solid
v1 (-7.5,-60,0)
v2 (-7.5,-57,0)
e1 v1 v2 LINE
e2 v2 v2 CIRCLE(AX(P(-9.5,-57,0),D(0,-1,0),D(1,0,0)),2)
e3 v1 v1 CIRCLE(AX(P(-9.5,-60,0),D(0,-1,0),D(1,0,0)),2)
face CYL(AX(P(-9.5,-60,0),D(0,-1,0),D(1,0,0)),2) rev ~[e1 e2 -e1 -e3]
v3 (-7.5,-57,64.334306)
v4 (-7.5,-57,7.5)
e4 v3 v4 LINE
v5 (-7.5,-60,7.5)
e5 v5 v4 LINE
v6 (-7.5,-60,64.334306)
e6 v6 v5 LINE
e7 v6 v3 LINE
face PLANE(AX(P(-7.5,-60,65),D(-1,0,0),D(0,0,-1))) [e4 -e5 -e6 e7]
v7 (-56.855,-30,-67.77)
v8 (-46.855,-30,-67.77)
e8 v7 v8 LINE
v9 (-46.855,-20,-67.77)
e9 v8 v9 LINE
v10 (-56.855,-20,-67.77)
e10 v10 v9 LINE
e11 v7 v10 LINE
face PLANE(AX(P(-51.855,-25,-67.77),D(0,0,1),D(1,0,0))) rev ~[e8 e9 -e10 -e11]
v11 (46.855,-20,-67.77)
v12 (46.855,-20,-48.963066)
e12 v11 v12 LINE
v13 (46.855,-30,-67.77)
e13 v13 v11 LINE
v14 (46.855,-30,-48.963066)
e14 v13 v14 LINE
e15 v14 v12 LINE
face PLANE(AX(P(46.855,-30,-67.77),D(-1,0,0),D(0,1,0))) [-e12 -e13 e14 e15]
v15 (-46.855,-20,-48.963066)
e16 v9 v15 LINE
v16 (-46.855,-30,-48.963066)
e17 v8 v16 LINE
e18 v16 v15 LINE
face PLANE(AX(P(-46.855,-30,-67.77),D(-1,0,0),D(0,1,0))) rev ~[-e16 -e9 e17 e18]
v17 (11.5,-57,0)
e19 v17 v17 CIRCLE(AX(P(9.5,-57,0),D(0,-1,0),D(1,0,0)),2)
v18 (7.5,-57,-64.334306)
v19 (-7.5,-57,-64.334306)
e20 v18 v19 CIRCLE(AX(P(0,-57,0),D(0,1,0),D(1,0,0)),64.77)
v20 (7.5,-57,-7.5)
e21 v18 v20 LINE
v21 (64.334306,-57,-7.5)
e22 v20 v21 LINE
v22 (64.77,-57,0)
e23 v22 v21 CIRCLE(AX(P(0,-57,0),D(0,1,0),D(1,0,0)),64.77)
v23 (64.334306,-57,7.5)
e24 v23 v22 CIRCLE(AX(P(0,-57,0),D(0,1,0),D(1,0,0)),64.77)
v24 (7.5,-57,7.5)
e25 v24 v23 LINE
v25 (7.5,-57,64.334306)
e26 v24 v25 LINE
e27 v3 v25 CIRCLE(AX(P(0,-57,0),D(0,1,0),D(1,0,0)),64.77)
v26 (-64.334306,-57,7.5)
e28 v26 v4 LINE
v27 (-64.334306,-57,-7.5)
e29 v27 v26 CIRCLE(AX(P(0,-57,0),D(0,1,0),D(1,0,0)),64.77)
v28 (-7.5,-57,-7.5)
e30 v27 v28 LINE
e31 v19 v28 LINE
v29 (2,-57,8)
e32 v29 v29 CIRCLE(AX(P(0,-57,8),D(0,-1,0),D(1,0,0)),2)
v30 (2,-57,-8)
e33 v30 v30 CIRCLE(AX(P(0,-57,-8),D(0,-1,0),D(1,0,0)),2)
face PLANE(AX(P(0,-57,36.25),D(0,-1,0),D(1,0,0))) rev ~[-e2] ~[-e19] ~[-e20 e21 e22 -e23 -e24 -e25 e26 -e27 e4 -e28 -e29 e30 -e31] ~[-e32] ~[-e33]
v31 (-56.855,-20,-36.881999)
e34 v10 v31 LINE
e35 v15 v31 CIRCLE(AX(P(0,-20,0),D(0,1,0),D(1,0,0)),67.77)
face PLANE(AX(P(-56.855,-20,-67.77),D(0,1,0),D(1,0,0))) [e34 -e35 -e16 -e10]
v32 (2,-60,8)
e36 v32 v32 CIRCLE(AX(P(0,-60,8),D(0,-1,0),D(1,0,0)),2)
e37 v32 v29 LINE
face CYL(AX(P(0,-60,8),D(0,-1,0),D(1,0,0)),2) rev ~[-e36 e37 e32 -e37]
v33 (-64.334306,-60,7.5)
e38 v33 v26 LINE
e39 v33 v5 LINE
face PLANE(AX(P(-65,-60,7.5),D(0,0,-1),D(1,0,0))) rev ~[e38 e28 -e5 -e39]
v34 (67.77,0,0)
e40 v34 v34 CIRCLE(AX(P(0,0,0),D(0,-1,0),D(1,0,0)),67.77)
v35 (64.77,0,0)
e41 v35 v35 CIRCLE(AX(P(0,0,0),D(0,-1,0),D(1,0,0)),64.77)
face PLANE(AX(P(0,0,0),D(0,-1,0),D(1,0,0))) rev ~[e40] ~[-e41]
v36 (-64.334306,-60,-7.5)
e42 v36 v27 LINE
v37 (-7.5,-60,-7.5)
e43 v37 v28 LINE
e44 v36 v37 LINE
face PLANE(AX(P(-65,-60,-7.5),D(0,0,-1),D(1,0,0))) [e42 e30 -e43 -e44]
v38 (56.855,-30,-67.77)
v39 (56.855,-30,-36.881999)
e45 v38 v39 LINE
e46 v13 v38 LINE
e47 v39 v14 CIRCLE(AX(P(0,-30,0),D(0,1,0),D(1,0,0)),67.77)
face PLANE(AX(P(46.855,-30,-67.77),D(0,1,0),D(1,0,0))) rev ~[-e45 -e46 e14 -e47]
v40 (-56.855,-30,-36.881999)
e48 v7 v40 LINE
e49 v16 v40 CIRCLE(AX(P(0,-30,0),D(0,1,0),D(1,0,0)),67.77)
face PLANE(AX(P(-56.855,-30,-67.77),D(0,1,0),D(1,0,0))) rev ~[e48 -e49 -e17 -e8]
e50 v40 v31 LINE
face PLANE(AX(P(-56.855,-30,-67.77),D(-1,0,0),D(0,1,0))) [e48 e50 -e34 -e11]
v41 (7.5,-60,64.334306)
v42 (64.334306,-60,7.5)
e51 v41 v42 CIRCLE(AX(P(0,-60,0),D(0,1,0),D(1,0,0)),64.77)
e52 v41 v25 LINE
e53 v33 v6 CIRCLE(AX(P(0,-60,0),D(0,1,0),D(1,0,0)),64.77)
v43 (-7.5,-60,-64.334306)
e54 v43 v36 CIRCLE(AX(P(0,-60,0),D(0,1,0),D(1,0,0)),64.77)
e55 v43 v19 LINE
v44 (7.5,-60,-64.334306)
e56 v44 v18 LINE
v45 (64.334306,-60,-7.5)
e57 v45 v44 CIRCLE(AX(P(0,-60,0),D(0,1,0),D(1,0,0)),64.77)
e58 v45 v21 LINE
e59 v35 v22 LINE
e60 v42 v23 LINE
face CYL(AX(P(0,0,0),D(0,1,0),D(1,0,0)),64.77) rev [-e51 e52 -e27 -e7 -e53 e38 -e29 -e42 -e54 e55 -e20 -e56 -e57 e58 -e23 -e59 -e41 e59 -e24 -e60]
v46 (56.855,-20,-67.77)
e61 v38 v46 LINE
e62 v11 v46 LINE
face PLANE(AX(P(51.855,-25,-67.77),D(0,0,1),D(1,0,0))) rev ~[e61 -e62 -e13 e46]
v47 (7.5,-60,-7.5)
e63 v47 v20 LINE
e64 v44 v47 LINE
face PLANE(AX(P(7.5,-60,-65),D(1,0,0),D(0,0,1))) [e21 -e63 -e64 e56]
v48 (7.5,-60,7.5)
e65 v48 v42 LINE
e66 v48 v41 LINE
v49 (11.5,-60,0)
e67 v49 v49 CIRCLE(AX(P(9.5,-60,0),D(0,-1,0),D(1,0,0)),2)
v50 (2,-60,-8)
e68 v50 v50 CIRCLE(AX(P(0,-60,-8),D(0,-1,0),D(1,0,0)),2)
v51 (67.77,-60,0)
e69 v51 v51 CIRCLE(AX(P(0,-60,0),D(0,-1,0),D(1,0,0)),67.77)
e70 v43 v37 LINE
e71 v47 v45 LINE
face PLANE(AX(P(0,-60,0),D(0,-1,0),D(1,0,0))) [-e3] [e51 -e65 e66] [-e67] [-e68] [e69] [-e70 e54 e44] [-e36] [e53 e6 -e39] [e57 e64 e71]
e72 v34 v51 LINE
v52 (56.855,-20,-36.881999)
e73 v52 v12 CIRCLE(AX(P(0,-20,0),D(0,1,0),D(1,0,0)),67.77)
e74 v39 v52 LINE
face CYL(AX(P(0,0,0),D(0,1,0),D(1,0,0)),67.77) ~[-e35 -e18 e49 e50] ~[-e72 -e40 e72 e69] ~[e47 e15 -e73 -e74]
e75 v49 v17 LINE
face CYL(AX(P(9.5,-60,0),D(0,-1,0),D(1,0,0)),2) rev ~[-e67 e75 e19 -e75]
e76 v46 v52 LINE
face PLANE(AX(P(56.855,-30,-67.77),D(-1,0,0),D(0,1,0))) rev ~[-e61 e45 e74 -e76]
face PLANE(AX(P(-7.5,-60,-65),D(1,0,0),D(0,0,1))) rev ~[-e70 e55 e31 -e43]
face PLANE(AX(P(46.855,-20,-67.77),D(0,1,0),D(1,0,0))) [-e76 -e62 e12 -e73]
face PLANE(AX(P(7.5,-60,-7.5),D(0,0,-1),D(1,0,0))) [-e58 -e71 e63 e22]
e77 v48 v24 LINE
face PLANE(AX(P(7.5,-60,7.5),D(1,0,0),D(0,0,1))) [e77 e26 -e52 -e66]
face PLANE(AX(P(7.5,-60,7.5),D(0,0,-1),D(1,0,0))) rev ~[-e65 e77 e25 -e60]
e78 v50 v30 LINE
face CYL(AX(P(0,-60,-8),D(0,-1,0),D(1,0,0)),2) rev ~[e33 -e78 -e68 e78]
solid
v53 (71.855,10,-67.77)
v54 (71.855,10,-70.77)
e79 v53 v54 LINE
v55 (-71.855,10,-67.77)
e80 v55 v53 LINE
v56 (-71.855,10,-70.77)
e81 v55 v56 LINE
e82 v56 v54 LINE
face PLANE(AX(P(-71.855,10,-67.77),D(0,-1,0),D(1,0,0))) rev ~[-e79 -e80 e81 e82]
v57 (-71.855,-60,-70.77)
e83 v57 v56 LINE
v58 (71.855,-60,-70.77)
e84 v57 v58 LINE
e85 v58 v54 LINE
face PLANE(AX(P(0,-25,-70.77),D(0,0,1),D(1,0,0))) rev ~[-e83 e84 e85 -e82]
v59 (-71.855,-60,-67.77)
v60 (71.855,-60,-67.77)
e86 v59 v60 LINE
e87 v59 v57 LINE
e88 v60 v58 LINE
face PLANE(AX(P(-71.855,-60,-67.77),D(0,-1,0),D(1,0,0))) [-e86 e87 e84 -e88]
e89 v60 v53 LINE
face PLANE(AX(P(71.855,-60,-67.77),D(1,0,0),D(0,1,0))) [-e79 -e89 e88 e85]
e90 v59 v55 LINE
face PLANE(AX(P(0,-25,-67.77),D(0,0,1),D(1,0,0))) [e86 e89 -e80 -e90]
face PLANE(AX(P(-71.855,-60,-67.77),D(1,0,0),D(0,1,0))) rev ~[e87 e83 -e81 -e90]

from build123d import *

# Parameters (mm, degrees)
F0_R        = 67.77
F1_DEPTH    = 60
F2_T        = -3
F4_W        = 143.71
F4_H        = 70
F5_DEPTH    = 3
F6_W        = 10
F6_H        = 10
F7_DEPTH    = 35
F8_T4_DEPTH = 77.0795565602
F8_S5_R     = 64.77
F8_T6_DEPTH = 41
F9_T4_DEPTH = 77.0795565602
F9_S5_R     = 64.77
F9_T6_DEPTH = 41
F10_W       = 15
F10_H       = 57.5
F10_W_2     = 57.5
F10_H_2     = 15
F11_DEPTH   = 3
F12_R       = 2
F13_DEPTH   = 3


# Not quite as in the source:
# - a fillet or chamfer that OpenCascade refuses, or shapes differently, is made with other operations: its cross-section is extruded or revolved along the edge and cut away or added


with BuildPart() as f1:
    # F0 (on Front) → F1 (new body)
    with BuildSketch(Plane.XZ):
        Circle(F0_R)
    extrude(amount=F1_DEPTH)

    # F2
    f2_openings = [f1.faces().sort_by_distance(p)[0] for p in [
        (0, -60, 0),
        (0, 0, 0),
    ]]
    offset(amount=F2_T, openings=f2_openings)

    # F6 (on face) → F7 (join)
    with BuildSketch(Plane.XY.offset(-67.77)):
        with Locations((-51.855, -25)):
            Rectangle(F6_W, F6_H)
        with Locations((51.855, -25)):
            Rectangle(F6_W, F6_H)
    extrude(amount=F7_DEPTH)

    # F8: chamfer of 10 x 13 on 1 edges, made by hand


with BuildPart() as f5:
    # F4 (on offset) → F5 (new body)
    with BuildSketch(Plane.XY.offset(-67.77)):
        with Locations((0, -25)):
            Rectangle(F4_W, F4_H)
    extrude(amount=-F5_DEPTH)


with BuildPart() as f8_tool2:
    # F8_s3 → F8_t4 (new body)
    with BuildSketch(Plane.XZ.offset(63.5397782801)):
        Polygon((-46.855, -45.77), (-56.855, -32.77), (-46.855, -32.77), align=None)
    extrude(amount=-F8_T4_DEPTH)

    # F8_s5 → F8_t6 (intersect, symmetric)
    with BuildSketch(Plane.XZ.offset(25)):
        Circle(F8_S5_R)
    extrude(amount=F8_T6_DEPTH, both=True, mode=Mode.INTERSECT)


with BuildPart() as f1_1:
    add(f1.part)

    # F8_t1: cut F8_tool2
    add(f8_tool2.part, mode=Mode.SUBTRACT)

    # F9: chamfer of 13 x 10 on 1 edges, made by hand


with BuildPart() as f9_tool2:
    # F9_s3 → F9_t4 (new body)
    with BuildSketch(Plane.XZ.offset(-13.5397782801)):
        Polygon((46.855, -45.77), (56.855, -32.77), (46.855, -32.77), align=None)
    extrude(amount=F9_T4_DEPTH)

    # F9_s5 → F9_t6 (intersect, symmetric)
    with BuildSketch(Plane.XZ.offset(25)):
        Circle(F9_S5_R)
    extrude(amount=F9_T6_DEPTH, both=True, mode=Mode.INTERSECT)


with BuildPart() as f1_2:
    add(f1_1.part)

    # F9_t1: cut F9_tool2
    add(f9_tool2.part, mode=Mode.SUBTRACT)

    # F10 (on face) → F11 (join)
    with BuildSketch(Plane.XZ.offset(60)):
        with Locations((0, 36.25)):
            Rectangle(F10_W, F10_H)
        with Locations((36.25, 0)):
            Rectangle(F10_W_2, F10_H_2)
        Rectangle(F10_W, F10_H_2)
        with Locations((-36.25, 0)):
            Rectangle(F10_W_2, F10_H_2)
        with Locations((0, -36.25)):
            Rectangle(F10_W, F10_H)
    extrude(amount=-F11_DEPTH)

    # F12 (on face) → F13 (cut)
    with BuildSketch(Plane.XZ.offset(60)):
        with Locations((0, 8)):
            Circle(F12_R)
        with Locations((9.5, 0)):
            Circle(F12_R)
        with Locations((-9.5, 0)):
            Circle(F12_R)
        with Locations((0, -8)):
            Circle(F12_R)
    extrude(amount=-F13_DEPTH, mode=Mode.SUBTRACT)


solid = Compound([f5.part, f1_2.part])
